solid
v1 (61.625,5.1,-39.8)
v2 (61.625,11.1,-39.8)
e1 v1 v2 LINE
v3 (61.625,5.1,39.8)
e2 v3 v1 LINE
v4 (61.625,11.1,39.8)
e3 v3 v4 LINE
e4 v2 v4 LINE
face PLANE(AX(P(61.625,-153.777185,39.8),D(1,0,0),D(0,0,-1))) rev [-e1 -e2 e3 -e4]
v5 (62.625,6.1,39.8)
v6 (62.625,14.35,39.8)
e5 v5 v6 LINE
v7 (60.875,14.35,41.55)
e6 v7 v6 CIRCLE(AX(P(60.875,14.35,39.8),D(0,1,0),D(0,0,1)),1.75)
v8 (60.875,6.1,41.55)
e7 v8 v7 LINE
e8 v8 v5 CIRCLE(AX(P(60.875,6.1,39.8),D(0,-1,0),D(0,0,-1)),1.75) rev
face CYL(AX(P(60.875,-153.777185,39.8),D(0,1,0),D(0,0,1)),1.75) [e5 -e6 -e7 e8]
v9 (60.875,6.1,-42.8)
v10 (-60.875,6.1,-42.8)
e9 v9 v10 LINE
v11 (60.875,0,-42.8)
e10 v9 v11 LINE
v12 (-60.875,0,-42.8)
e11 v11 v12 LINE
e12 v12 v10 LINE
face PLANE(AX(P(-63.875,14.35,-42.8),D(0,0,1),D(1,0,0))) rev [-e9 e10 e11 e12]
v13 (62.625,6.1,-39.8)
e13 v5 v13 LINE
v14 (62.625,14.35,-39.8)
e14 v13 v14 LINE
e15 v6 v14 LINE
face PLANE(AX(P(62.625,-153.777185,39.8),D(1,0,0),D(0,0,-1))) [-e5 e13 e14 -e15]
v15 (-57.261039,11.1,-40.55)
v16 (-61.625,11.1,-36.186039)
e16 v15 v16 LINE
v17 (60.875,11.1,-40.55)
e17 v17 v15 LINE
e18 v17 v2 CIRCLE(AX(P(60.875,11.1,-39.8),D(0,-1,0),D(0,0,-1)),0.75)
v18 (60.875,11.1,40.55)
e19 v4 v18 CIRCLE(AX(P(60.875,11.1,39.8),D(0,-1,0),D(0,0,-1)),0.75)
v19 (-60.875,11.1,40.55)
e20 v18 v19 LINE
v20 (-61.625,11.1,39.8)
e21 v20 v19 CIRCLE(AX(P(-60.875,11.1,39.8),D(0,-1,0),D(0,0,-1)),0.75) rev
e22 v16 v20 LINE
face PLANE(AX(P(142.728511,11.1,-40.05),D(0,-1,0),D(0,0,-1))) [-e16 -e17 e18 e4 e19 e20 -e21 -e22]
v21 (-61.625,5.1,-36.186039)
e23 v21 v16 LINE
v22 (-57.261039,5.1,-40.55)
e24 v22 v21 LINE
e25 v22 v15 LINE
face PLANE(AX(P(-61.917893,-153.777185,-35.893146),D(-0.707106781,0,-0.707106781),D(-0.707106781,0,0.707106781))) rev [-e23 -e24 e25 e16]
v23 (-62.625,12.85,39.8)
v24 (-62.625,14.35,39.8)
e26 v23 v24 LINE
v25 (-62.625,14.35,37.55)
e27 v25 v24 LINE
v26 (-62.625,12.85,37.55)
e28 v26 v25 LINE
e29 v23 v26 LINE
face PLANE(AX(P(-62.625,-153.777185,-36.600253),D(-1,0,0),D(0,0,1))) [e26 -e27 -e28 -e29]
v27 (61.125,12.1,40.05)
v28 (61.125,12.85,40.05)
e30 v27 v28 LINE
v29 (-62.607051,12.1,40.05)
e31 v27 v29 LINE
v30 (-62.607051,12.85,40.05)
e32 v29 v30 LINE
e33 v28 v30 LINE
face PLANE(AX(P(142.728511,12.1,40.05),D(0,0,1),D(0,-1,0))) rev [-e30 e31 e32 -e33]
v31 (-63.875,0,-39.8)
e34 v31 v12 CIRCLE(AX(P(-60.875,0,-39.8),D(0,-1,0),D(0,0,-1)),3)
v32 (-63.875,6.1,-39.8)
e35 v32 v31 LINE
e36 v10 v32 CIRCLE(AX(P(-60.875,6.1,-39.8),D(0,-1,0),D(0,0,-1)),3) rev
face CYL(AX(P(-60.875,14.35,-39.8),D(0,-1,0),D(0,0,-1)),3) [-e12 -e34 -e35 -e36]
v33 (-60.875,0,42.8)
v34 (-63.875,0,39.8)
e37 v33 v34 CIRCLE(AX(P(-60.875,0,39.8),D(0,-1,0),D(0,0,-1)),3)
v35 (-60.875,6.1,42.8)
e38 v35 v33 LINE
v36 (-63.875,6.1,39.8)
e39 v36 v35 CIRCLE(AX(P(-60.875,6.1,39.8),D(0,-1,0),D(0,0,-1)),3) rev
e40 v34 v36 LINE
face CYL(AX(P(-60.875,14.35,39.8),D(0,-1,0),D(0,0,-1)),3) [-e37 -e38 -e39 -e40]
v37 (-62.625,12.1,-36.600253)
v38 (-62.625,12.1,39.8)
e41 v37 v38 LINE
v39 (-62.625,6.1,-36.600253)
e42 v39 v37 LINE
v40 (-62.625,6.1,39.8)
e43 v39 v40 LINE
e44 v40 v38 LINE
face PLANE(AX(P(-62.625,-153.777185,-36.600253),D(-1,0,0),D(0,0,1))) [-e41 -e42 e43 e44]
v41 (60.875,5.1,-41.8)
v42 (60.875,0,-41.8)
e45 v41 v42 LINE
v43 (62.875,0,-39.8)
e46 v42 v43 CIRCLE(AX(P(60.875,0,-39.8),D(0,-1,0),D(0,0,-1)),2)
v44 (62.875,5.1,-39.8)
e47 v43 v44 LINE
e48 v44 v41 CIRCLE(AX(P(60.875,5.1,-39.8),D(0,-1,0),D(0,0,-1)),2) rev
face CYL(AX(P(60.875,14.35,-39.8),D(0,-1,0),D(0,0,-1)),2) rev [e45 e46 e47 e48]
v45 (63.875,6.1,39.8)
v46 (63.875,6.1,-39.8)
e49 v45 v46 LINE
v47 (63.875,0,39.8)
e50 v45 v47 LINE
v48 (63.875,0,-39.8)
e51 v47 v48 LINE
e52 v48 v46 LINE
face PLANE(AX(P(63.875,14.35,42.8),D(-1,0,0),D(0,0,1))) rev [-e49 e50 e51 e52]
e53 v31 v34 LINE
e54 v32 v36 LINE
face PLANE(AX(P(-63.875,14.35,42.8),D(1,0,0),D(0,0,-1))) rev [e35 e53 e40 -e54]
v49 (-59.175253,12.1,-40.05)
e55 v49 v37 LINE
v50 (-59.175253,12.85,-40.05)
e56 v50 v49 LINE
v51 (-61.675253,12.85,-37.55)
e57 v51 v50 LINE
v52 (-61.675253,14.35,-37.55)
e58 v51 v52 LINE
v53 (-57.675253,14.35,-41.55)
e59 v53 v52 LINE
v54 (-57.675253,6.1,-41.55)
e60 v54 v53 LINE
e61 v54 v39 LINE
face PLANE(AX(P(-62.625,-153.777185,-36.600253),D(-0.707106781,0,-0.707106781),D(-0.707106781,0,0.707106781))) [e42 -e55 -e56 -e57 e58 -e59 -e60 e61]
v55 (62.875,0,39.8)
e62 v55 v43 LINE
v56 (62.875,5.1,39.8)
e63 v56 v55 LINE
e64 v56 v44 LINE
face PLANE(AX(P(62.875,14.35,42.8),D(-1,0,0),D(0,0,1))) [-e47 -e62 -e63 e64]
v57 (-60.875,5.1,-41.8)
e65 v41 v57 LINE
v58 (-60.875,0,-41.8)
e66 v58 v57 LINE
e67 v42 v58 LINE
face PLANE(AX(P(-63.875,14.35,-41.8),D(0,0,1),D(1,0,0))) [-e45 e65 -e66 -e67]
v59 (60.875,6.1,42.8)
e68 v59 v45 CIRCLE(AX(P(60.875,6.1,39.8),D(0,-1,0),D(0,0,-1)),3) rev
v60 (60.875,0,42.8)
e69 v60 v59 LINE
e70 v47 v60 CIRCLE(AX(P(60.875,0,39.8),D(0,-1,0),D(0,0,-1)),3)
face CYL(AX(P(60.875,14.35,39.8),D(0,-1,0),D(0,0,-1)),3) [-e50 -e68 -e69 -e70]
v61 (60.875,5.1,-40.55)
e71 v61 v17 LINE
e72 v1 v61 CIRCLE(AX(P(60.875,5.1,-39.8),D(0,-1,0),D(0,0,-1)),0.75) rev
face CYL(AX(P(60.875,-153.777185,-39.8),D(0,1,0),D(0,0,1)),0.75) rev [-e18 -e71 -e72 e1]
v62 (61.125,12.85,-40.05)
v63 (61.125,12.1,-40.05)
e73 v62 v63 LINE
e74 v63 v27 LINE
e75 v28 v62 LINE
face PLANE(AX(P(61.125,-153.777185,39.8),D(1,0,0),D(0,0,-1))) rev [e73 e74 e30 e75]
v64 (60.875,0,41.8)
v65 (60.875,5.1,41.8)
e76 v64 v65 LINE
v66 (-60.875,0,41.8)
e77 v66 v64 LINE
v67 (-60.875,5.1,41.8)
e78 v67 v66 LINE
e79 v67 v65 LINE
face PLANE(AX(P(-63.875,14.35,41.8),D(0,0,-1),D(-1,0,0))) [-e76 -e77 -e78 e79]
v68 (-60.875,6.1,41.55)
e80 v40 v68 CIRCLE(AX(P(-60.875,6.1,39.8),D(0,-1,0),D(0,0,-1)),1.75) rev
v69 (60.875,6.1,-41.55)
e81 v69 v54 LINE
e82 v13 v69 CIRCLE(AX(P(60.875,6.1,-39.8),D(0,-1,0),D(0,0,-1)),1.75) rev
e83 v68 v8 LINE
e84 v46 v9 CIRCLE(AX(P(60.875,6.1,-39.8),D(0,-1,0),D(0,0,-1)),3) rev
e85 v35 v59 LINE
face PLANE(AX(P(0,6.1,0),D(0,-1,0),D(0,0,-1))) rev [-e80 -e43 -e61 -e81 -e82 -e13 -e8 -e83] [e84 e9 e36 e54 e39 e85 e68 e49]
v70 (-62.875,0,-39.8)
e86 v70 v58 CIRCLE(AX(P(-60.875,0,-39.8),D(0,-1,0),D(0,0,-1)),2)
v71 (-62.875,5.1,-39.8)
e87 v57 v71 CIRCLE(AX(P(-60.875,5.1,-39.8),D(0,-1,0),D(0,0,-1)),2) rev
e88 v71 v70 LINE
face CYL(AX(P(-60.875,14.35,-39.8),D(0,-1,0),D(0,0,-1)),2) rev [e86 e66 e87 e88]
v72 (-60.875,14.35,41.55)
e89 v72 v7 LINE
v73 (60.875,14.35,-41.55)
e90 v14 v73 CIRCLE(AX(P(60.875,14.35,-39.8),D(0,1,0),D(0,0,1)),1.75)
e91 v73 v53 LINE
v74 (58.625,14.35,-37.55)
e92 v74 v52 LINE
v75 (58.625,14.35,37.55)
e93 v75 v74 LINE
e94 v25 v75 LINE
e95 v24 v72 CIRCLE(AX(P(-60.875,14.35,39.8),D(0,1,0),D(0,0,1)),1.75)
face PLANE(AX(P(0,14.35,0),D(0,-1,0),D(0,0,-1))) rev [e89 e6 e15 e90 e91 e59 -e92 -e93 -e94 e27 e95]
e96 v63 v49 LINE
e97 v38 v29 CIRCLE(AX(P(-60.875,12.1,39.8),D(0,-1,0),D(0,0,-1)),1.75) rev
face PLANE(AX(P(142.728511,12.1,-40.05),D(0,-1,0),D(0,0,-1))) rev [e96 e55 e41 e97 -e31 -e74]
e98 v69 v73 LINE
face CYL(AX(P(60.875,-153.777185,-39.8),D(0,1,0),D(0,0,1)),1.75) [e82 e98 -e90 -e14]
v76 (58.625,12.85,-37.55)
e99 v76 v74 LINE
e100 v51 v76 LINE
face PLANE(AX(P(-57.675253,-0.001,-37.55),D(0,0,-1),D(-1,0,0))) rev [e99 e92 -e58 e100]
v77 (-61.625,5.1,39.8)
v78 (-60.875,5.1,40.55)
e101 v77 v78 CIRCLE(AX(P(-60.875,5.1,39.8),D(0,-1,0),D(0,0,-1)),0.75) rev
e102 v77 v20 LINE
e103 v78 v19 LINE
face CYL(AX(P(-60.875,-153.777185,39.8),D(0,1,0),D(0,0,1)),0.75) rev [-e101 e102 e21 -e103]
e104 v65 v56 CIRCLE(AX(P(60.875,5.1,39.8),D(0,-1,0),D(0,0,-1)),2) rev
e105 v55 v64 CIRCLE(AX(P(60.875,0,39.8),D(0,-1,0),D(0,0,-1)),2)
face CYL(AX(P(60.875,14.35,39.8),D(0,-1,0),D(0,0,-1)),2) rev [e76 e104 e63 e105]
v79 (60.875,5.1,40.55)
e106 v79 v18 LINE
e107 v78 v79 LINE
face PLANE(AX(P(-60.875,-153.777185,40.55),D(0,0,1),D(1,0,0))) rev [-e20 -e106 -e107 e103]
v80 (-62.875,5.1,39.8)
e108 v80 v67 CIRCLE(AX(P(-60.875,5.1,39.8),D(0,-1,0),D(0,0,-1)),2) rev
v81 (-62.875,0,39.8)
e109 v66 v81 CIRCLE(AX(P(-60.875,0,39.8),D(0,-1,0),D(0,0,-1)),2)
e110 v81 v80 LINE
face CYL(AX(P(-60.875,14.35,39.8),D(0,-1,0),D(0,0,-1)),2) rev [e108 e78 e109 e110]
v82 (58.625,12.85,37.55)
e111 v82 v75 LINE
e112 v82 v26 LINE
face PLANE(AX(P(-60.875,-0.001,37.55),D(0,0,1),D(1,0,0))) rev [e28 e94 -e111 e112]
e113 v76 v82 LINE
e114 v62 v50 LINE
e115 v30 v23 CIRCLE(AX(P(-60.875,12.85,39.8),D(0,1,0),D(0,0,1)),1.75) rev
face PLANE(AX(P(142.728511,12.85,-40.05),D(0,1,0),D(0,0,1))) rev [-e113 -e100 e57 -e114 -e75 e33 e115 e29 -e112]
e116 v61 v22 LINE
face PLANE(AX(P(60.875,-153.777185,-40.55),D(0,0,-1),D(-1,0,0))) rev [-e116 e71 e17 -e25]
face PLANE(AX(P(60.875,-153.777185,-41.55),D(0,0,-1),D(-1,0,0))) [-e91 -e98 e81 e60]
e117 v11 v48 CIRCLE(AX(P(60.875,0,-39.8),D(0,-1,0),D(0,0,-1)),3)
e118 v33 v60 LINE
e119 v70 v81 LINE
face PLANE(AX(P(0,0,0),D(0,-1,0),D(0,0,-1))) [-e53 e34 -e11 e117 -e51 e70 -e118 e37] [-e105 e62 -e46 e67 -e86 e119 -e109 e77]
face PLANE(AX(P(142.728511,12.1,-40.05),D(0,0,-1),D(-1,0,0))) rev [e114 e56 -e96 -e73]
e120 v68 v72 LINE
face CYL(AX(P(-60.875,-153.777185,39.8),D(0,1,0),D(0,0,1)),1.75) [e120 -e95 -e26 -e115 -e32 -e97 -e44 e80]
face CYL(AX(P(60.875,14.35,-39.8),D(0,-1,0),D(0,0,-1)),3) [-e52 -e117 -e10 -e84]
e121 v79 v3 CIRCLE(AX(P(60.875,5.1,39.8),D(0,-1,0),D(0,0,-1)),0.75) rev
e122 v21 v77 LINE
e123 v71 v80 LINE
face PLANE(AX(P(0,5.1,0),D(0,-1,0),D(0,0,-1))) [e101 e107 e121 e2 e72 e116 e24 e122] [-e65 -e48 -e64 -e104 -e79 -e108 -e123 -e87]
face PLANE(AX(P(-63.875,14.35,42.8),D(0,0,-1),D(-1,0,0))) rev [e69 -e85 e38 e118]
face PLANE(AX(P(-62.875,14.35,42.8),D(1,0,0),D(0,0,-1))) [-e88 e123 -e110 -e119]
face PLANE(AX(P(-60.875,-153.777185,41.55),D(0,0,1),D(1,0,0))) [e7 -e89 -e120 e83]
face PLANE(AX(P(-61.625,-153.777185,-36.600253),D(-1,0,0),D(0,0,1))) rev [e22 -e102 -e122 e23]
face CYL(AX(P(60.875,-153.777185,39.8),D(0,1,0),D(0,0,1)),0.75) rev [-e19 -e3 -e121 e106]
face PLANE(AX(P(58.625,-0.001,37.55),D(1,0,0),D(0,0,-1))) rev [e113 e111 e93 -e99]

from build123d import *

# Parameters (mm, degrees)
SKETCH1_W           = 127.75
SKETCH1_H           = 85.6
BOSS_EXTRUDE1_DEPTH = 14.35
FILLET1_R           = 3
CUT_FLANGE_DEPTH    = 8.25
SKETCH5_W           = 80.1
SKETCH5_H           = 0.75
CUT_PAPERSLOT_DEPTH = 123.75
CUT_OPENTOP_REACH   = 80.216
SHELL1_DEPTH        = 11.1
SHELL1_2_DEPTH      = 5.1


# Read off the part's stored shape, not the designer's step: Shell1
with BuildPart() as part:
    # Sketch1 → Boss-Extrude1 (new body)
    with BuildSketch(Plane(origin=(0, 0, 0), x_dir=(1, 0, 0), z_dir=(0, 1, 0))):
        Rectangle(SKETCH1_W, SKETCH1_H)
    extrude(amount=BOSS_EXTRUDE1_DEPTH)

    # Fillet1
    fillet1_edges = [part.edges().sort_by_distance(p)[0] for p in [
        (-63.875, 7.175, -42.8),
        (63.875, 7.175, -42.8),
        (63.875, 7.175, 42.8),
        (-63.875, 7.175, 42.8),
    ]]
    fillet(fillet1_edges, radius=FILLET1_R)

    # Sketch3 → Cut-Flange (cut)
    with BuildSketch(Plane(origin=(0, 14.35, 0), x_dir=(1, 0, 0), z_dir=(0, 1, 0))):
        with BuildLine():
            Line((-63.875, 39.8), (-63.875, -39.8))
            ThreePointArc((-63.875, -39.8), (-62.996320344, -41.921320344), (-60.875, -42.8))
            Line((-60.875, -42.8), (60.875, -42.8))
            ThreePointArc((60.875, -42.8), (62.996320344, -41.921320344), (63.875, -39.8))
            Line((63.875, -39.8), (63.875, 39.8))
            ThreePointArc((63.875, 39.8), (62.996320344, 41.921320344), (60.875, 42.8))
            Line((60.875, 42.8), (-60.875, 42.8))
            ThreePointArc((-60.875, 42.8), (-62.996320344, 41.921320344), (-63.875, 39.8))
        make_face()
        with BuildLine():
            Line((-62.625, 36.600252532), (-62.625, -39.8))
            ThreePointArc((-62.625, -39.8), (-62.112436867, -41.037436867), (-60.875, -41.55))
            Line((-60.875, -41.55), (60.875, -41.55))
            ThreePointArc((60.875, -41.55), (62.112436867, -41.037436867), (62.625, -39.8))
            Line((62.625, -39.8), (62.625, 39.8))
            ThreePointArc((62.625, 39.8), (62.112436867, 41.037436867), (60.875, 41.55))
            Line((60.875, 41.55), (-57.675252532, 41.55))
            Line((-57.675252532, 41.55), (-62.625, 36.600252532))
        make_face(mode=Mode.SUBTRACT)
    extrude(amount=-CUT_FLANGE_DEPTH, mode=Mode.SUBTRACT)

    # Sketch5 → Cut-PaperSlot (cut)
    with BuildSketch(Plane.ZY.offset(62.625)):
        with Locations((0, 12.475)):
            Rectangle(SKETCH5_W, SKETCH5_H)
    extrude(amount=-CUT_PAPERSLOT_DEPTH, mode=Mode.SUBTRACT)

    # Sketch6 → Cut-OpenTop (cut, up to next)
    with BuildSketch(Plane(origin=(0, 14.35, 0), x_dir=(1, 0, 0), z_dir=(0, 1, 0)), mode=Mode.PRIVATE) as cut_opentop_sk1:
        Polygon((-57.675252532, 37.55), (-61.675252532, 37.55), (-62.625, 36.600252532), (-62.625, -37.55), (-60.875, -37.55), (58.625, -37.55), (58.625, 37.55), align=None)
    cut_opentop_tool1 = extrude(cut_opentop_sk1.sketch, amount=-CUT_OPENTOP_REACH, mode=Mode.PRIVATE) & part.part
    add(cut_opentop_tool1.solids().sort_by_distance((-1.997013, 14.35, 0.001844))[0], mode=Mode.SUBTRACT)

    # Shell1 outline → Shell1 (cut)
    with BuildSketch(Plane(origin=(0, 0, 0), x_dir=(1, 0, 0), z_dir=(0, 1, 0))):
        with BuildLine():
            Line((-61.625, 36.186038969), (-61.625, -39.8))
            ThreePointArc((-61.625, -39.8), (-61.405330086, -40.330330086), (-60.875, -40.55))
            Line((-60.875, -40.55), (60.875, -40.55))
            ThreePointArc((60.875, -40.55), (61.405330086, -40.330330086), (61.625, -39.8))
            Line((61.625, -39.8), (61.625, 39.8))
            ThreePointArc((61.625, 39.8), (61.405330086, 40.330330086), (60.875, 40.55))
            Line((60.875, 40.55), (-57.261038969, 40.55))
            Line((-57.261038969, 40.55), (-61.625, 36.186038969))
        make_face()
    extrude(amount=SHELL1_DEPTH, mode=Mode.SUBTRACT)

    # Shell1 2 outline → Shell1 2 (cut)
    with BuildSketch(Plane(origin=(0, 0, 0), x_dir=(1, 0, 0), z_dir=(0, 1, 0))):
        with BuildLine():
            Line((-62.875, 39.8), (-62.875, -39.8))
            ThreePointArc((-62.875, -39.8), (-62.289213562, -41.214213562), (-60.875, -41.8))
            Line((-60.875, -41.8), (60.875, -41.8))
            ThreePointArc((60.875, -41.8), (62.289213562, -41.214213562), (62.875, -39.8))
            Line((62.875, -39.8), (62.875, 39.8))
            ThreePointArc((62.875, 39.8), (62.289213562, 41.214213562), (60.875, 41.8))
            Line((60.875, 41.8), (-60.875, 41.8))
            ThreePointArc((-60.875, 41.8), (-62.289213562, 41.214213562), (-62.875, 39.8))
        make_face()
        with BuildLine():
            ThreePointArc((-60.875, -40.55), (-61.405330086, -40.330330086), (-61.625, -39.8))
            Line((-61.625, -39.8), (-61.625, 36.186038969))
            Line((-61.625, 36.186038969), (-57.261038969, 40.55))
            Line((-57.261038969, 40.55), (60.875, 40.55))
            ThreePointArc((60.875, 40.55), (61.405330086, 40.330330086), (61.625, 39.8))
            Line((61.625, 39.8), (61.625, -39.8))
            ThreePointArc((61.625, -39.8), (61.405330086, -40.330330086), (60.875, -40.55))
            Line((60.875, -40.55), (-60.875, -40.55))
        make_face(mode=Mode.SUBTRACT)
    extrude(amount=SHELL1_2_DEPTH, mode=Mode.SUBTRACT)


solid = part.part
